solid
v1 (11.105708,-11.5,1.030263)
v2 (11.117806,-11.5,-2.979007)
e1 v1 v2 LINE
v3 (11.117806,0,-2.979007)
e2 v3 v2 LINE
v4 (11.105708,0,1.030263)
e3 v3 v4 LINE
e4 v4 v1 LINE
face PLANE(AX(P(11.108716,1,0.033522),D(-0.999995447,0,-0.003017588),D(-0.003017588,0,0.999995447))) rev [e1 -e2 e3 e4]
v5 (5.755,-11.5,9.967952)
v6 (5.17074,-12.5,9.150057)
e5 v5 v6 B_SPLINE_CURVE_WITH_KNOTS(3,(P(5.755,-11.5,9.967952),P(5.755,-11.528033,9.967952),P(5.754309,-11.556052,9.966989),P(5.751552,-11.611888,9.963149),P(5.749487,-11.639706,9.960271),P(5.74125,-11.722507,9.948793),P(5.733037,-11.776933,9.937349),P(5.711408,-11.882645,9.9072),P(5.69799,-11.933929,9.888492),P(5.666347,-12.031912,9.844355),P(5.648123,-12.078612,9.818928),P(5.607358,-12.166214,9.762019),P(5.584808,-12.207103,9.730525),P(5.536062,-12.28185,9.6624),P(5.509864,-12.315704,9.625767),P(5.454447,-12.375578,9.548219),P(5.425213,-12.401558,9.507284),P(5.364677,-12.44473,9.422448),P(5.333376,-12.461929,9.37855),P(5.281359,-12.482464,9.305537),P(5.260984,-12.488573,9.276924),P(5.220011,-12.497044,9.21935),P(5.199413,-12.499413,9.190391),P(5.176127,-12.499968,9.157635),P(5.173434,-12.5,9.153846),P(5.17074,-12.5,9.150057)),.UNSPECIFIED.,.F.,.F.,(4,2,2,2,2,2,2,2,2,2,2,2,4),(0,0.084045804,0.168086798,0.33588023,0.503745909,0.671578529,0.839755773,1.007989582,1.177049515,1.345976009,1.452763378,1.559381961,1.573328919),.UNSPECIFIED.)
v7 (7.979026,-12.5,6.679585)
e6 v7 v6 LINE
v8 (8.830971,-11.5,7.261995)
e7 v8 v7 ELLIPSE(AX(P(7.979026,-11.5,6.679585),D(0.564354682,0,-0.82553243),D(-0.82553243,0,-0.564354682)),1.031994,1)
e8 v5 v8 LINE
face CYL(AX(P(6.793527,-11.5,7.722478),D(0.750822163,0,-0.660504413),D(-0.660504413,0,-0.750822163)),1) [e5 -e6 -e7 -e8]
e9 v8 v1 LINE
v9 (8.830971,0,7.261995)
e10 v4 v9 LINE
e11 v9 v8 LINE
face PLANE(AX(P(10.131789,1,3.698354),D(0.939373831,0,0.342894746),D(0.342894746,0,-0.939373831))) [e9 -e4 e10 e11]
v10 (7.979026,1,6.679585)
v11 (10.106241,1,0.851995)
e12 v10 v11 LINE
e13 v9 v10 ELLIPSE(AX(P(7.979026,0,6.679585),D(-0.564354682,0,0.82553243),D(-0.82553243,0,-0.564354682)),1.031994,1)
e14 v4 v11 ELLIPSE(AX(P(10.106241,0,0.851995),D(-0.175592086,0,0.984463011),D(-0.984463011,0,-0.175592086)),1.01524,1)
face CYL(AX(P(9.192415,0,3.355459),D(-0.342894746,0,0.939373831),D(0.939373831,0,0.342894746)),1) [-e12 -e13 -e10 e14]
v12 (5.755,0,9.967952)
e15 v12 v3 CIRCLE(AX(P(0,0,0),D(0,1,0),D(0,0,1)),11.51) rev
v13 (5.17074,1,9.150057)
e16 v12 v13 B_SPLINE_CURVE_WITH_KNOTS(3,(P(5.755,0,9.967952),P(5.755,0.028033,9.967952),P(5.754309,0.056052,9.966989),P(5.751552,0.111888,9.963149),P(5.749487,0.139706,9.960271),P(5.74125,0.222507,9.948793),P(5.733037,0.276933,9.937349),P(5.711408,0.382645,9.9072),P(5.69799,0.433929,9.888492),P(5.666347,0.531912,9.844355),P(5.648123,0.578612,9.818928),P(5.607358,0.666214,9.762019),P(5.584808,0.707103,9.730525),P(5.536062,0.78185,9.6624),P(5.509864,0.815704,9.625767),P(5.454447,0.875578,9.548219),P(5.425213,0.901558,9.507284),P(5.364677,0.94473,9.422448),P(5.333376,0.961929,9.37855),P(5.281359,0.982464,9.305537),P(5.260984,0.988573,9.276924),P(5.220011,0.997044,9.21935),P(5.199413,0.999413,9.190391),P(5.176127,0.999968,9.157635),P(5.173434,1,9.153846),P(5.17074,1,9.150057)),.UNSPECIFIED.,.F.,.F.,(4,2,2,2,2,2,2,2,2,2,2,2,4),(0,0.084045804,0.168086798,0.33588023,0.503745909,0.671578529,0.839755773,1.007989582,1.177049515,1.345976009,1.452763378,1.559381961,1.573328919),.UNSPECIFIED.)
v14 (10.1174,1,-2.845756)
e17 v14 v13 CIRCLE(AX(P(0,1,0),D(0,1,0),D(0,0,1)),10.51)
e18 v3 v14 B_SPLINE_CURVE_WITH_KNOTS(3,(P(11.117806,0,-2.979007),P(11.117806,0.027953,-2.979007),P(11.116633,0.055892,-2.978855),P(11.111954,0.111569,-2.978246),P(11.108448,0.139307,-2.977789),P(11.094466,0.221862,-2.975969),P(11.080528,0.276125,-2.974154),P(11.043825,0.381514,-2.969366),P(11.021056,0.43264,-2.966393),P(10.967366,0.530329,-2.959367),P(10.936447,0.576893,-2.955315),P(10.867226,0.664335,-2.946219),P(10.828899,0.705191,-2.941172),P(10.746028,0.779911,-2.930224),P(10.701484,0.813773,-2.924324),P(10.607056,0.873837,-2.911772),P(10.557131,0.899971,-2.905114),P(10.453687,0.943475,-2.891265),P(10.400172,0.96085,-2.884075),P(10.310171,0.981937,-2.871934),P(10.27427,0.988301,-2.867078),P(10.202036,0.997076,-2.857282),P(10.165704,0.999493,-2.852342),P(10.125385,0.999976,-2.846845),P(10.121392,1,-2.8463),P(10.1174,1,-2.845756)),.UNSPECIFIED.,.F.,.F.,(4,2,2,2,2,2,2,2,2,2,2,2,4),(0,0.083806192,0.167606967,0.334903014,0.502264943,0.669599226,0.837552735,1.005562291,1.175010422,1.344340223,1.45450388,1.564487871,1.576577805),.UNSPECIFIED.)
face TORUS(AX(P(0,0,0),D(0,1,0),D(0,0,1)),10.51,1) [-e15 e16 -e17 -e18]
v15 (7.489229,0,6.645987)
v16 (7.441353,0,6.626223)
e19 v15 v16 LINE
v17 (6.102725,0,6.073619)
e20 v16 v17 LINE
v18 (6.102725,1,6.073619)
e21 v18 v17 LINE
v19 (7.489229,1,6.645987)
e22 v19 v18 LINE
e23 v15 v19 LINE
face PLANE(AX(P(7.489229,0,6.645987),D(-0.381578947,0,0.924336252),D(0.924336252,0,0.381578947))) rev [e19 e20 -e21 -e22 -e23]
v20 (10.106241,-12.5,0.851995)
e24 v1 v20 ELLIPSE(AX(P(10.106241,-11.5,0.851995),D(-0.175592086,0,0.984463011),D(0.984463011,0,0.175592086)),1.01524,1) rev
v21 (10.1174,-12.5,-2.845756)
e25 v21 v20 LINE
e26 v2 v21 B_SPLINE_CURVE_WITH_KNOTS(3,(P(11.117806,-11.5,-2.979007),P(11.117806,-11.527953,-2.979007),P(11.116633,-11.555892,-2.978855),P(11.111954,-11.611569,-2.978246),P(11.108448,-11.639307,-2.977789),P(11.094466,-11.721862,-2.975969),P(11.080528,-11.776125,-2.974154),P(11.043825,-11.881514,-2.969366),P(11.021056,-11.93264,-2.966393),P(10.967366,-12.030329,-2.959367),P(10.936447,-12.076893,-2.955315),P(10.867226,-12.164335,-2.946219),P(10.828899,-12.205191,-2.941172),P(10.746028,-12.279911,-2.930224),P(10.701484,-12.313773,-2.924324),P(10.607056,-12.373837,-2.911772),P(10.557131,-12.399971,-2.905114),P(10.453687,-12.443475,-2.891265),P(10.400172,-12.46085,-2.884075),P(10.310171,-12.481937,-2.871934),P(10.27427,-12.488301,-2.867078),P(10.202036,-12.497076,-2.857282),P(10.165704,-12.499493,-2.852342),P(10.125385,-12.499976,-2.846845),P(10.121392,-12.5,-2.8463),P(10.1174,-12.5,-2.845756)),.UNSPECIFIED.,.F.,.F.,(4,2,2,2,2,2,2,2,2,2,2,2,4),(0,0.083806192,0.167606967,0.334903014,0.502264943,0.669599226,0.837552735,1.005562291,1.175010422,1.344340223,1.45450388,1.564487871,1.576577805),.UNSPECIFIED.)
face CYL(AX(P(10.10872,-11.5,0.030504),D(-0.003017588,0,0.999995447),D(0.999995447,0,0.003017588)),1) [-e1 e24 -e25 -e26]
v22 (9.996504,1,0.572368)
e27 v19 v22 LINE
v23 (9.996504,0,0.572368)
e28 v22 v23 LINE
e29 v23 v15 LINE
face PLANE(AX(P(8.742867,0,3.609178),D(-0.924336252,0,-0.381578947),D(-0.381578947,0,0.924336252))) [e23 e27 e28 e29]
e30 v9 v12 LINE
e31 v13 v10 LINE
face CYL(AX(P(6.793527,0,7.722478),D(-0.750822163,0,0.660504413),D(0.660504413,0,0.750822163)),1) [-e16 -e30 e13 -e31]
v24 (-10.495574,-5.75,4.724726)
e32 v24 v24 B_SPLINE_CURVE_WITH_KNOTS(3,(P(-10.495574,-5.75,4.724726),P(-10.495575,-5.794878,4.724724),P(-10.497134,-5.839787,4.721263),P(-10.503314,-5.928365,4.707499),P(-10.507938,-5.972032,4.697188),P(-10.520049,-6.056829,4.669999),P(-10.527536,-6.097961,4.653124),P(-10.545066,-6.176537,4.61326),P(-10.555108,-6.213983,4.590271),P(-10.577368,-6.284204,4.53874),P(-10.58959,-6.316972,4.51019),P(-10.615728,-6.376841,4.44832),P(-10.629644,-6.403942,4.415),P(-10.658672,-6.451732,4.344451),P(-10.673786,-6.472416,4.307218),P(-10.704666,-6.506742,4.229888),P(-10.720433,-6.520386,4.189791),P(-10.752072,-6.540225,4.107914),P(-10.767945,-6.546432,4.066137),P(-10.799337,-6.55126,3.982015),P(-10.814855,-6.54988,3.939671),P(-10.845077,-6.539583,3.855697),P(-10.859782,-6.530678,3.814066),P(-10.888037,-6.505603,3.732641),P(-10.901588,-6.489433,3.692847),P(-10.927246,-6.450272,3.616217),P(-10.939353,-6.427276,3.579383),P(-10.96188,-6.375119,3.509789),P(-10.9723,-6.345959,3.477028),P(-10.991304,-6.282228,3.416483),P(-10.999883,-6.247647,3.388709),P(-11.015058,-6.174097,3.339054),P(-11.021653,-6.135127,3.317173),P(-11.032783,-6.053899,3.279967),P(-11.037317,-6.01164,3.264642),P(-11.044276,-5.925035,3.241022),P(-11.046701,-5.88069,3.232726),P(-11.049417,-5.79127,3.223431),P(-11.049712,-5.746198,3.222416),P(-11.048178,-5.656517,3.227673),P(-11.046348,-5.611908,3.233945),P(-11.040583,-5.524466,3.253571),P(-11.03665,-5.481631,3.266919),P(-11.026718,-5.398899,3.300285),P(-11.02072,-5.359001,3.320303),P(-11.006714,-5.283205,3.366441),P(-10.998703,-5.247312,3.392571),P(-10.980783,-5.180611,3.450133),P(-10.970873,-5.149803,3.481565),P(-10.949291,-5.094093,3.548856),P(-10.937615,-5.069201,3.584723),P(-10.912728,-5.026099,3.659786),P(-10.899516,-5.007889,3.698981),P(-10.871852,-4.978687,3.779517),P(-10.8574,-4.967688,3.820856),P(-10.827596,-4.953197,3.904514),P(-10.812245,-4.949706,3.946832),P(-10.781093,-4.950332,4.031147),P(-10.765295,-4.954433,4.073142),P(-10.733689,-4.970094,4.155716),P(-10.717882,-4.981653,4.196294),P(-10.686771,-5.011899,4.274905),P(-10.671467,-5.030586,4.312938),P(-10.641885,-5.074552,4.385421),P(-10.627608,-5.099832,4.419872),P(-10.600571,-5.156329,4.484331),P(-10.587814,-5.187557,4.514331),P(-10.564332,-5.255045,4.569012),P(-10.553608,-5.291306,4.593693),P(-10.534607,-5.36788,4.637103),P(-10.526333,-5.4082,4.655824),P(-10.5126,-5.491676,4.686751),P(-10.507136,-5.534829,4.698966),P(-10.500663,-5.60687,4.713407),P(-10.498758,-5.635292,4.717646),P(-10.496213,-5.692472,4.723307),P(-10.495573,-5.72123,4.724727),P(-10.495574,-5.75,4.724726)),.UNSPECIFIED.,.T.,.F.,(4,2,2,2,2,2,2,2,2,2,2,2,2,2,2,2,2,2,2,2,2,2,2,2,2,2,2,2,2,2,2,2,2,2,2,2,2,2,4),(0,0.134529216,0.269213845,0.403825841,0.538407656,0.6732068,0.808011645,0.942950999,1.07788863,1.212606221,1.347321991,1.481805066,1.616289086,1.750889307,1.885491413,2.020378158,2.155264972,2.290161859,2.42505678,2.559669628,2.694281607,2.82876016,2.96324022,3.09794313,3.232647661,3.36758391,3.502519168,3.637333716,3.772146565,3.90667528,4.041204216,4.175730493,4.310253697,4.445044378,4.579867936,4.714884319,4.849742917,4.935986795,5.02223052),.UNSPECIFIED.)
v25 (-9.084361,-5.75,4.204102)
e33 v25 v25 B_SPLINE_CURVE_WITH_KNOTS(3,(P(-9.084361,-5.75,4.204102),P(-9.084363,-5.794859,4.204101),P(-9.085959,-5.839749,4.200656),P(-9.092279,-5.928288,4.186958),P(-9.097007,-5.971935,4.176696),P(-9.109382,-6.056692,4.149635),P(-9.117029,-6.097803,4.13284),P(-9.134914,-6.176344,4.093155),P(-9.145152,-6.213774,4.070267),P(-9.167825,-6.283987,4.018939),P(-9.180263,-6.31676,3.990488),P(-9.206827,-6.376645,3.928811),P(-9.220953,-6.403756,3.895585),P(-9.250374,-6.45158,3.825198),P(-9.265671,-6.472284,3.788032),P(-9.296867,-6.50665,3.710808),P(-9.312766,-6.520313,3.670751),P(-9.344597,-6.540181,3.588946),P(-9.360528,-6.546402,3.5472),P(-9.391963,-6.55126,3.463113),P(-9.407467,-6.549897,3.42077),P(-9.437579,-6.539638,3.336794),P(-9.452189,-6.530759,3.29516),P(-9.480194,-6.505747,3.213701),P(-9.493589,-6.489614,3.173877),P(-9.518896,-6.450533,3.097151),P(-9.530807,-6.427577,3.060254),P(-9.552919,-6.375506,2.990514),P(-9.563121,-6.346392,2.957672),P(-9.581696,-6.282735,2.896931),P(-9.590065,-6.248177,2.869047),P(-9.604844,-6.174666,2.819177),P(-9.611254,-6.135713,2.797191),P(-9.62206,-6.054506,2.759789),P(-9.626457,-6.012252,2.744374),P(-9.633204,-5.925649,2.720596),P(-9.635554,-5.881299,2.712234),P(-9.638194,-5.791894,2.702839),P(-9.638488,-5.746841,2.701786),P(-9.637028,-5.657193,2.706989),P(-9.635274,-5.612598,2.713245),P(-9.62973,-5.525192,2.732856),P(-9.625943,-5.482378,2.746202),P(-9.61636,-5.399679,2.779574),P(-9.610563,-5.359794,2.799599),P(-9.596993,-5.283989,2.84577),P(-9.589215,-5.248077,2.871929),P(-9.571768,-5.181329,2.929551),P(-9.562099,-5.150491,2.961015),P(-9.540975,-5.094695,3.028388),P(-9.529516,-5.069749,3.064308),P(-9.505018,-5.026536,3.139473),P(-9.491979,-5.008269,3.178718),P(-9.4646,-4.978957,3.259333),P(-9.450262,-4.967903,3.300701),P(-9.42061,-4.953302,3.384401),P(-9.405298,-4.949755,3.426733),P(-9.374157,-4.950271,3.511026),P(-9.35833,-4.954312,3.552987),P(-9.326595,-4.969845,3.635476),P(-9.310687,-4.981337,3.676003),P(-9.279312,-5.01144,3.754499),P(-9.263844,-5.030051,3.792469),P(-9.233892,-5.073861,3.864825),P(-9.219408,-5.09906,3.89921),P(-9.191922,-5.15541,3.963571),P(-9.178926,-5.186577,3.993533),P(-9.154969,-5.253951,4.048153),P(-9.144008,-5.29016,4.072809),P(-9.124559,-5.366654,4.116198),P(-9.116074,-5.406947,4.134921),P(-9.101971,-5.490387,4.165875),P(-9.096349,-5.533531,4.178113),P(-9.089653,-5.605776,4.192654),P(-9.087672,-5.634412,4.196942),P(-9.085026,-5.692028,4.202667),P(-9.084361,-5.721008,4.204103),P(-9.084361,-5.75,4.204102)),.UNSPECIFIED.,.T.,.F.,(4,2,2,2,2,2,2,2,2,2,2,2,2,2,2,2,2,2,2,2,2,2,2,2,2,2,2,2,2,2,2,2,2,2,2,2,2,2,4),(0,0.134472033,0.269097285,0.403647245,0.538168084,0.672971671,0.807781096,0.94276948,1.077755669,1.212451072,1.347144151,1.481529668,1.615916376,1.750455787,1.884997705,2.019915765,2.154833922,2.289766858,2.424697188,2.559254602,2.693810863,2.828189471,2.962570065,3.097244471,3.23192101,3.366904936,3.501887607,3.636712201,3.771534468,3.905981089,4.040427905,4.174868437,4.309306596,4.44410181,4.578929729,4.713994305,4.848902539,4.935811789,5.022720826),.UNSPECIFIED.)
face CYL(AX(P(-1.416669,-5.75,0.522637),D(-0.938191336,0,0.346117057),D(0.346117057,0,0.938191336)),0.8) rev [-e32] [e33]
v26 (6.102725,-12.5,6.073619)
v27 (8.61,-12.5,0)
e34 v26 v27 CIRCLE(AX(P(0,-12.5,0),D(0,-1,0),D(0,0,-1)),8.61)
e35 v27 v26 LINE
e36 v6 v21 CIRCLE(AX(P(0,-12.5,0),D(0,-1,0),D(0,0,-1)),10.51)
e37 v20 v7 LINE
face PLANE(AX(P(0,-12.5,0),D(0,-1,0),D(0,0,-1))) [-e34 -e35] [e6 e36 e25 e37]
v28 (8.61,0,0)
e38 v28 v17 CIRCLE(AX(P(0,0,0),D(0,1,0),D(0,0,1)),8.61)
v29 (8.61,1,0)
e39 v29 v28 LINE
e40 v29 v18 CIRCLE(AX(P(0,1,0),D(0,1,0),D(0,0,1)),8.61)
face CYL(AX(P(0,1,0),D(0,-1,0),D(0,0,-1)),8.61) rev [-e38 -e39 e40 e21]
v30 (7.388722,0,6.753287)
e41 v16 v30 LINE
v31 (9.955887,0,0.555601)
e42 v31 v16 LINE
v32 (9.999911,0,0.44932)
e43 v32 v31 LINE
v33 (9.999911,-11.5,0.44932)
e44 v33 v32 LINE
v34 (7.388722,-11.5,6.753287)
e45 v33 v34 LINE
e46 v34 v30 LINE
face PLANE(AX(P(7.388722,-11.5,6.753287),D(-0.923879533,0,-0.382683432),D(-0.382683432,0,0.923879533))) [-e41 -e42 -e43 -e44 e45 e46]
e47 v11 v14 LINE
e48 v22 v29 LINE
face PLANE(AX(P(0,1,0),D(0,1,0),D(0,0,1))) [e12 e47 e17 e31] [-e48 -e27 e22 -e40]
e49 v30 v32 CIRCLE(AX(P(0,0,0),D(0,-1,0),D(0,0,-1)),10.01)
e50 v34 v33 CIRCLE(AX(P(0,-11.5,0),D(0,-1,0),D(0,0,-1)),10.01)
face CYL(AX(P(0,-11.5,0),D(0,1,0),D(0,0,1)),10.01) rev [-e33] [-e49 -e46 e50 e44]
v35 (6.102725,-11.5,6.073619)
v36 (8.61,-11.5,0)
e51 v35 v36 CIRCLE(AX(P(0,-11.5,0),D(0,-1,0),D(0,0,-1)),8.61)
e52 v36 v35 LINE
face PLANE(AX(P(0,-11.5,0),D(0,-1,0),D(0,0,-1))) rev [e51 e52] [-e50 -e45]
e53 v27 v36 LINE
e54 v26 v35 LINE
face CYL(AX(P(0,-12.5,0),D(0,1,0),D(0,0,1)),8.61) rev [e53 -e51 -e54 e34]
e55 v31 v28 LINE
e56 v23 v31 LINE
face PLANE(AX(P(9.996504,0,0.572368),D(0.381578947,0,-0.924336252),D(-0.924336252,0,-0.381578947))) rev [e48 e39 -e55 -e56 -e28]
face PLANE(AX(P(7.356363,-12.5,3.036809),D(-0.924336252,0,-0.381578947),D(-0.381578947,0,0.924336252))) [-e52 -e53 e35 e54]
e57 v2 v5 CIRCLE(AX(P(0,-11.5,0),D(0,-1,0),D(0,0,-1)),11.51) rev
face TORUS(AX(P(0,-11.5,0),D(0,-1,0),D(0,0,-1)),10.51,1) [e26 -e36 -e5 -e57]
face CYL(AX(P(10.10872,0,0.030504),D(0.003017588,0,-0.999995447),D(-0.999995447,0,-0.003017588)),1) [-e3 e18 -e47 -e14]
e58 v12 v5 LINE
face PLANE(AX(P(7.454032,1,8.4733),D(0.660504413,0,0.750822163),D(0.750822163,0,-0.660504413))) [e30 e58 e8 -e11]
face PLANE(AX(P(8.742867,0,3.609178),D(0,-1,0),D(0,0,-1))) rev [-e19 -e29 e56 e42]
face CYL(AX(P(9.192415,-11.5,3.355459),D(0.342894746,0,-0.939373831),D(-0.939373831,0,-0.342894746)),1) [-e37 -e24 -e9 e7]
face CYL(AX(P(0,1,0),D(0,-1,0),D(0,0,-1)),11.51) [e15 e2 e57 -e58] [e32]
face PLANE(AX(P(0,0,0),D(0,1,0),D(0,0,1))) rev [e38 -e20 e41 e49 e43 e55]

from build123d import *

# Parameters (mm, degrees)
EXTRUDE_1_DEPTH     = 1
EXTRUDE_START       = 11.5
EXTRUDE_3_DEPTH     = 11.5
EXTRUDE_START_2     = 1
EXTRUDE_4_DEPTH     = 1
FILLET_1_R          = 1
FILLET_2_R          = 1
CUT_EXTRUDE_1_DEPTH = 1.5
SKETCH2_R           = 0.8000000000000002
CUT_EXTRUDE1_DEPTH  = 10


with BuildPart() as part:
    # 草图1 → 凸台-拉伸1 (new body)
    with BuildSketch(Plane(origin=(0, 0, 0), x_dir=(1, 0, 0), z_dir=(0, 1, 0))):
        with BuildLine():
            Line((11.105707880639235, -1.030263157894738), (8.830971038533972, -7.261995457156121))
            Line((8.830971038533972, -7.261995457156121), (5.755000000000001, -9.96795239755889))
            ThreePointArc((5.755000000000001, -9.96795239755889), (-10.633853419204911, 4.404686306522179), (11.117806260587173, 2.9790072091300246))
            Line((11.117806260587173, 2.9790072091300246), (11.105707880639235, -1.030263157894738))
        make_face()
        with BuildLine():
            Line((8.61, 0), (6.102725069252079, -6.073618915368515))
            ThreePointArc((6.102725069252079, -6.073618915368515), (-7.958535130482882, 3.2853947368421053), (8.61, 0))
        make_face(mode=Mode.SUBTRACT)
    extrude(amount=EXTRUDE_1_DEPTH)

    # 草图2 → 凸台-拉伸3 (add)
    with BuildSketch(Plane(origin=(0, 0, 0), x_dir=(-1, 0, 0), z_dir=(0, -1, 0)).offset(EXTRUDE_START)):
        with BuildLine():
            Line((-11.105707880639235, -1.0302631578947385), (-11.117806260587194, 2.979007209129939))
            ThreePointArc((-11.117806260587194, 2.979007209129939), (10.633853419204895, 4.4046863065222155), (-5.755, -9.967952397558888))
            Line((-5.755, -9.967952397558888), (-8.830971038533972, -7.261995457156121))
            Line((-8.830971038533972, -7.261995457156121), (-11.105707880639235, -1.0302631578947385))
        make_face()
        with BuildLine():
            Line((-7.38872176822761, -6.753287394426469), (-9.999910578514989, -0.44931995471382746))
            ThreePointArc((-9.999910578514989, -0.44931995471382746), (9.248034120437978, 3.8306611579745526), (-7.38872176822761, -6.753287394426469))
        make_face(mode=Mode.SUBTRACT)
    extrude(amount=-EXTRUDE_3_DEPTH)

    # 草图5 → 凸台-拉伸4 (add)
    with BuildSketch(Plane(origin=(0, -11.5, 0), x_dir=(-1, 0, 0), z_dir=(0, -1, 0)).offset(EXTRUDE_START_2)):
        with BuildLine():
            Line((-11.117806260587196, 2.9790072091299398), (-11.105707880639235, -1.0302631578947385))
            Line((-11.105707880639235, -1.0302631578947385), (-8.830971038533972, -7.261995457156121))
            Line((-8.830971038533972, -7.261995457156121), (-5.75500000000001, -9.967952397558882))
            ThreePointArc((-5.75500000000001, -9.967952397558882), (10.633853419204897, 4.4046863065222155), (-11.117806260587196, 2.9790072091299398))
        make_face()
        with BuildLine():
            Line((-8.609999999999998, 4.3e-16), (-6.102725069252077, -6.073618915368515))
            ThreePointArc((-6.102725069252077, -6.073618915368515), (7.958535130482882, 3.2853947368421044), (-8.609999999999998, 4.3e-16))
        make_face(mode=Mode.SUBTRACT)
    extrude(amount=-EXTRUDE_4_DEPTH)

    # 圆角1
    # the kernel refuses this fillet: 1 mm, written as the material it takes off along each edge
    with BuildSketch(Plane(origin=(10.708026446892594, -12.5, 5.610734425716317), x_dir=(-0.6605044125759215, 0, -0.7508221633434492), z_dir=(-0.7508221633434492, 0, 0.6605044125759215))) as fillet_1_piece_1:
        with BuildLine():
            CenterArc((FILLET_1_R, -FILLET_1_R), FILLET_1_R, 90, 90)
            Line((-5.1e-16, -FILLET_1_R), (0, 0))
            Line((0, 0), (FILLET_1_R, 0))
        make_face()
    extrude(amount=9.096803728910329, mode=Mode.SUBTRACT)
    with BuildSketch(Plane(origin=(6.9e-16, -12.5, -2.44e-15), x_dir=(0.6755263906448474, 0, 0.7373358092093079), z_dir=(0.7373358092093079, 0, -0.6755263906448474))) as fillet_1_piece_2:
        with BuildLine():
            CenterArc((11.509999999999996 - FILLET_1_R, -FILLET_1_R), FILLET_1_R, 0, 90)
            Line((11.509999999999996 - FILLET_1_R, 0), (11.509999999999996, 0))
            Line((11.509999999999996, 0), (11.509999999999996, -FILLET_1_R))
        make_face()
    revolve(axis=Axis((6.9e-16, -12.5, -2.44e-15), (0, -1, 0)), revolution_arc=309.9900816208065, mode=Mode.SUBTRACT)
    with BuildSketch(Plane(origin=(11.1253502297869, -12.5, -5.47899582680977), x_dir=(0, 1, 0), z_dir=(-0.0030175876798964035, 0, 0.9999954470719326))) as fillet_1_piece_3:
        with BuildLine():
            CenterArc((FILLET_1_R, FILLET_1_R), FILLET_1_R, 180, 90)
            Line((0, FILLET_1_R), (0, 0))
            Line((0, 0), (FILLET_1_R, 0))
        make_face()
    extrude(amount=9.009288621027371, mode=Mode.SUBTRACT)
    with BuildSketch(Plane(origin=(11.962944744412491, -12.5, -1.3181714184535556), x_dir=(7e-17, 1, 3e-17), z_dir=(-0.34289474550930243, 0, 0.9393738305393177))) as fillet_1_piece_4:
        with BuildLine():
            CenterArc((FILLET_1_R, FILLET_1_R), FILLET_1_R, 180, 90)
            Line((-8e-17, FILLET_1_R), (0, 0))
            Line((0, 0), (FILLET_1_R, 0))
        make_face()
    extrude(amount=11.633921551427072, mode=Mode.SUBTRACT)

    # 圆角2
    # the kernel refuses this fillet: 1 mm, written as the material it takes off along each edge
    with BuildSketch(Plane(origin=(11.1253502297869, 1, -5.4789958268098555), x_dir=(0, -1, 0), z_dir=(-0.0030175876798905804, 0, 0.9999954470719326))) as fillet_2_piece_1:
        with BuildLine():
            CenterArc((FILLET_2_R, -FILLET_2_R), FILLET_2_R, 90, 90)
            Line((0, -FILLET_2_R), (0, 0))
            Line((0, 0), (FILLET_2_R, 0))
        make_face()
    extrude(amount=9.009288621027455, mode=Mode.SUBTRACT)
    with BuildSketch(Plane(origin=(9.9e-16, 1, -2.2e-16), x_dir=(0.6755263906448468, 0, 0.7373358092093085), z_dir=(0.7373358092093085, 0, -0.6755263906448468))) as fillet_2_piece_2:
        with BuildLine():
            CenterArc((11.51 - FILLET_2_R, FILLET_2_R), FILLET_2_R, 270, 90)
            Line((11.51 - FILLET_2_R, 0), (11.51, 0))
            Line((11.51, 0), (11.51, FILLET_2_R))
        make_face()
    revolve(axis=Axis((9.9e-16, 1, -2.2e-16), (0, -1, 0)), revolution_arc=309.99008162080594, mode=Mode.SUBTRACT)
    with BuildSketch(Plane(origin=(10.708026446892594, 1, 5.610734425716318), x_dir=(-0.6605044125759214, 0, -0.7508221633434493), z_dir=(-0.7508221633434492, 0, 0.6605044125759213))) as fillet_2_piece_3:
        with BuildLine():
            CenterArc((FILLET_2_R, FILLET_2_R), FILLET_2_R, 180, 90)
            Line((0, FILLET_2_R), (0, 0))
            Line((0, 0), (FILLET_2_R, 0))
        make_face()
    extrude(amount=9.096803728910338, mode=Mode.SUBTRACT)
    with BuildSketch(Plane(origin=(11.962944744412493, 1, -1.318171418453556), x_dir=(-0.9393738305393178, 0, -0.3428947455093024), z_dir=(-0.3428947455093024, 0, 0.9393738305393177))) as fillet_2_piece_4:
        with BuildLine():
            CenterArc((FILLET_2_R, FILLET_2_R), FILLET_2_R, 180, 90)
            Line((-6.1e-16, FILLET_2_R), (0, 0))
            Line((0, 0), (FILLET_2_R, 0))
        make_face()
    extrude(amount=11.633921551427074, mode=Mode.SUBTRACT)

    # 草图7 → 切除-拉伸1 (cut)
    with BuildSketch(Plane(origin=(7.3563625346260375, 0, 3.036809457684256), x_dir=(-0.3815789473684208, 0, 0.9243362520886044), z_dir=(-0.9243362520886044, 0, -0.3815789473684208))):
        Polygon((-3.2853947368421035, 0), (3.2853947368421053, 0), (3.2853947368421057, 1), (-3.2853947368421035, 1), align=None)
    extrude(amount=-CUT_EXTRUDE_1_DEPTH, mode=Mode.SUBTRACT)

    # Sketch2 → Cut-Extrude1 (cut)
    with BuildSketch(Plane(origin=(-10.79858227646779, 0, 3.9838073269619487), x_dir=(0.3461170570774934, 0, 0.938191335922484), z_dir=(-0.938191335922484, 0, 0.34611705707749346))):
        with Locations((0, -5.75)):
            Circle(SKETCH2_R)
    extrude(amount=-CUT_EXTRUDE1_DEPTH, mode=Mode.SUBTRACT)


solid = part.part
